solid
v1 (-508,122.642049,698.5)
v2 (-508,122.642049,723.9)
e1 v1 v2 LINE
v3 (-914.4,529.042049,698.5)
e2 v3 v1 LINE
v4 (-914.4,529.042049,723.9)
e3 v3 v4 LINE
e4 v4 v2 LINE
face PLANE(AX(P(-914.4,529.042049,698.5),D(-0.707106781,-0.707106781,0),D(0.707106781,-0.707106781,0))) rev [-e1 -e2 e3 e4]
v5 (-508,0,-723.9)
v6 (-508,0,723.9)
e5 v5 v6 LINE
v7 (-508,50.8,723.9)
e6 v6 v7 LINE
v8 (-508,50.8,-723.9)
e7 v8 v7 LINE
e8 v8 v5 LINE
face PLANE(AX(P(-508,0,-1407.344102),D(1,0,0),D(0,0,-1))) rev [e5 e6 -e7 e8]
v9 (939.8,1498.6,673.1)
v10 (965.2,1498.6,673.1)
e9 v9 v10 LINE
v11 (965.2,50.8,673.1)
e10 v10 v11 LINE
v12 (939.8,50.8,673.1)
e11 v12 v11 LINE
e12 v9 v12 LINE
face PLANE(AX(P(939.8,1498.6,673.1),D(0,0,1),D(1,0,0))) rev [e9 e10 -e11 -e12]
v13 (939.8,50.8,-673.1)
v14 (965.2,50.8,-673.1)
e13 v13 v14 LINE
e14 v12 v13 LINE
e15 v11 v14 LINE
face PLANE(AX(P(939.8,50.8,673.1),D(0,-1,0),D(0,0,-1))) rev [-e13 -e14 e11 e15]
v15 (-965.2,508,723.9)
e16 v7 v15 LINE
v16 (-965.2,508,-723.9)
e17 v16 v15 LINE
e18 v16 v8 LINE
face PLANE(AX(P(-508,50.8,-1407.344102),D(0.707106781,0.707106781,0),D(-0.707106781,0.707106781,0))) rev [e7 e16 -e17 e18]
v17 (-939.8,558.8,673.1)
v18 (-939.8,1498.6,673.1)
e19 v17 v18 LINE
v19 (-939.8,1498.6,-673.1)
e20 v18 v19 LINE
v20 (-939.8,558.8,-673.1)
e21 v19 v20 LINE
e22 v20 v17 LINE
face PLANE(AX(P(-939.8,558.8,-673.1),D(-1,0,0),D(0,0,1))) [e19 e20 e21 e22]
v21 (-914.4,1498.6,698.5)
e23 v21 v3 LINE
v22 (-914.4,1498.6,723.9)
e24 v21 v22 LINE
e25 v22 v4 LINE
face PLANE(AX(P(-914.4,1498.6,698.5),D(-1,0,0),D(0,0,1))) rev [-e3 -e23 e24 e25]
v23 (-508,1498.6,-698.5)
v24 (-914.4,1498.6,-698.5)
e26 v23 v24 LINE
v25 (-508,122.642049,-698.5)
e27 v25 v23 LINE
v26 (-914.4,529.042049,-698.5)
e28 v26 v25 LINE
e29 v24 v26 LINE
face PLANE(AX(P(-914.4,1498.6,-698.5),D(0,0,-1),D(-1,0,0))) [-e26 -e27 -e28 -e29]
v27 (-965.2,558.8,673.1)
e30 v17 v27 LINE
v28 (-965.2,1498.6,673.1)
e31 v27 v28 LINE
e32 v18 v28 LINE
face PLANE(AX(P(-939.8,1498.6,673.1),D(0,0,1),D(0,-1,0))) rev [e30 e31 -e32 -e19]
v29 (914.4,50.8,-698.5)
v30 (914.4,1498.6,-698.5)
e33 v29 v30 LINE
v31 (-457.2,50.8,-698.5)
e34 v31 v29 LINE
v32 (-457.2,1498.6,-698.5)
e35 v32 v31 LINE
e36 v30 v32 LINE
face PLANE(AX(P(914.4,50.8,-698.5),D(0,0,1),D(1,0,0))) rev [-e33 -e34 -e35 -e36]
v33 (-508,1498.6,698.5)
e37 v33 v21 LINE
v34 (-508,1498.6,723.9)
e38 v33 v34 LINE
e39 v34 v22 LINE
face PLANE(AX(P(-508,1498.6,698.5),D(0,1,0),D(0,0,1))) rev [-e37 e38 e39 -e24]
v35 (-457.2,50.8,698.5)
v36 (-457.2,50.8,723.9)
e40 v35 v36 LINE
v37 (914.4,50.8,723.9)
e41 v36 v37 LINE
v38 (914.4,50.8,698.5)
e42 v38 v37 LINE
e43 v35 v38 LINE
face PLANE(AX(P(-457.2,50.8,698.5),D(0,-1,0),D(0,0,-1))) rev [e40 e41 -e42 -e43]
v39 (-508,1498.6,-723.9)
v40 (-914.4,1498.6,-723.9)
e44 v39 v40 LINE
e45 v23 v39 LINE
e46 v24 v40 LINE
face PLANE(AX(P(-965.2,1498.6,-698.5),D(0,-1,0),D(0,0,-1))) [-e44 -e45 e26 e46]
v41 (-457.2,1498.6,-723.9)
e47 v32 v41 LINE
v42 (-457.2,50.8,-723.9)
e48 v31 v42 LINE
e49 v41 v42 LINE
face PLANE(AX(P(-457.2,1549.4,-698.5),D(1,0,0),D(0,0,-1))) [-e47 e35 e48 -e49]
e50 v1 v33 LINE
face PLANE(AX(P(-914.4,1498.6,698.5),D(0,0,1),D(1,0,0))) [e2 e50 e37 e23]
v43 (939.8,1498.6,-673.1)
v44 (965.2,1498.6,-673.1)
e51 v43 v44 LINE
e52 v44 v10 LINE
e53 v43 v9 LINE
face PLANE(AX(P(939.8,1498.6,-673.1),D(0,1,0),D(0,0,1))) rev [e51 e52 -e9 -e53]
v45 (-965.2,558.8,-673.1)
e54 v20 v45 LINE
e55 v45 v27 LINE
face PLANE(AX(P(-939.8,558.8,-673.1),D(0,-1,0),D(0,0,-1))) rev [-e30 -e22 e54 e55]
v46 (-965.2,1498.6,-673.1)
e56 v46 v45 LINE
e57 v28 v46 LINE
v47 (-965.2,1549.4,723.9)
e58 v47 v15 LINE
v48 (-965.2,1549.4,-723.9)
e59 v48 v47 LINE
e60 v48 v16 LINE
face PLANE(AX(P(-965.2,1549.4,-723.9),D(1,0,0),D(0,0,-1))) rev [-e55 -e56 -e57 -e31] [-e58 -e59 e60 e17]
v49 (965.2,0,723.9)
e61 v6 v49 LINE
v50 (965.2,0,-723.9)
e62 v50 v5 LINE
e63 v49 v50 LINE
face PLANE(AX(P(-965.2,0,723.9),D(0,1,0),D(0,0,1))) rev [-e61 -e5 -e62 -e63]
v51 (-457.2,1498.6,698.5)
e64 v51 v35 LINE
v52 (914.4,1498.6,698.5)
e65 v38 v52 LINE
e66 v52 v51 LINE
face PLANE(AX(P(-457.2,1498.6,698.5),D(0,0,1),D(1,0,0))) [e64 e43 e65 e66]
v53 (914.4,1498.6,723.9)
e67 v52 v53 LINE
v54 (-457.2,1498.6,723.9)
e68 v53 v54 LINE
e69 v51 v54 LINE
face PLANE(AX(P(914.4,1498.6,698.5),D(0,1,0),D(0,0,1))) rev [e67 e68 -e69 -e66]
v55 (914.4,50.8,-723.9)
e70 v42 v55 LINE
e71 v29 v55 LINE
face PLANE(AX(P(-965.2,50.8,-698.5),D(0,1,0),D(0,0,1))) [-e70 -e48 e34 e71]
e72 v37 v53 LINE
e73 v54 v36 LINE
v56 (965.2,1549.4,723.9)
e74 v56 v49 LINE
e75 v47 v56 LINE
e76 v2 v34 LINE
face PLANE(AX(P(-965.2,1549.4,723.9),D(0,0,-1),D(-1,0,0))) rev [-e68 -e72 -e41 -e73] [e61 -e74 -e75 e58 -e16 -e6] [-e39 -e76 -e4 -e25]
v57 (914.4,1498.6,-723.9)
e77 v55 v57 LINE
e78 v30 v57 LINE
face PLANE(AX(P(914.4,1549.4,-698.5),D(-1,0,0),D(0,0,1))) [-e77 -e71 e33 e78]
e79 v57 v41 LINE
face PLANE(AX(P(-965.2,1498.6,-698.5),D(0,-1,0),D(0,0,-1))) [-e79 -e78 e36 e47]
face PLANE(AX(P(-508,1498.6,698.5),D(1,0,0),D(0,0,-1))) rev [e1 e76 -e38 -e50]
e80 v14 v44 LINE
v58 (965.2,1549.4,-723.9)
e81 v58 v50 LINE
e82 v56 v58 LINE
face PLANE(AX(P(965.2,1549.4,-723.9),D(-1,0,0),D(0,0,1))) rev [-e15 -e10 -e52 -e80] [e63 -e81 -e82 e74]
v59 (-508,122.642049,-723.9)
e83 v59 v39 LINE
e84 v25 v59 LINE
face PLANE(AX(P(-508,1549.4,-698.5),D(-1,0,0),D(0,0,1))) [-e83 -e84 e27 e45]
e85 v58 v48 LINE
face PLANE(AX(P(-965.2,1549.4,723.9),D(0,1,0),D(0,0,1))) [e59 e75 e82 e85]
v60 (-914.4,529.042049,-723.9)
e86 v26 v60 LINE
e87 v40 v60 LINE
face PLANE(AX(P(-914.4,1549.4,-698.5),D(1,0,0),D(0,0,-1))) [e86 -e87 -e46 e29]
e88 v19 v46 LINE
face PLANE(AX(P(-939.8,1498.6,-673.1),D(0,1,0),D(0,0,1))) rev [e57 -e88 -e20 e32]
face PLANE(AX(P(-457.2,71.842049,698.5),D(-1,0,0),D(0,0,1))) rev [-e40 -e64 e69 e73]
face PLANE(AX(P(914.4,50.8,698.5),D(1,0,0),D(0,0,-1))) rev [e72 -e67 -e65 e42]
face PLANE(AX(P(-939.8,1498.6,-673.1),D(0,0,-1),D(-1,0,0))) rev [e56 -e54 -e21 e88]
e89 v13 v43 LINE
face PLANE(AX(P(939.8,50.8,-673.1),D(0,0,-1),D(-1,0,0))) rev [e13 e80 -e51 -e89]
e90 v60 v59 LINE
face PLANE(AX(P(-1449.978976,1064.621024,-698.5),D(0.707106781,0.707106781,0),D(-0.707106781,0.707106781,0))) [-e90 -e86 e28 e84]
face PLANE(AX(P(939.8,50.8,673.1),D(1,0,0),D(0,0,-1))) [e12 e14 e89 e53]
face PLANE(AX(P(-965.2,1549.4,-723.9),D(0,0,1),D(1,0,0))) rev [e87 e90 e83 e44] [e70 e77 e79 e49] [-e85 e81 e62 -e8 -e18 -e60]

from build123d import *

# Parameters (mm, degrees)
SKETCH1_W              = 1930.4
SKETCH1_H              = 1447.8
BOSS_EXTRUDE1_DEPTH    = 1549.4
CUT_EXTRUDE1_DEPTH     = 1447.8
CUT_EXTRUDE2_DEPTH     = 25.4
CUT_EXTRUDE3_START     = -1447.8
CUT_EXTRUDE3_OUTLINE_W = 1371.6
CUT_EXTRUDE3_OUTLINE_H = 1447.8
CUT_EXTRUDE3_DEPTH     = 25.4
SKETCH4_W              = 1346.2
SKETCH4_H              = 939.8
CUT_EXTRUDE4_DEPTH     = 25.4
SKETCH5_W              = 1346.2
SKETCH5_H              = 1447.8
CUT_EXTRUDE5_DEPTH     = 25.4


# Read off the part's stored shape, not the designer's step: Cut-Extrude3
with BuildPart() as part:
    # Sketch1 → Boss-Extrude1 (new body)
    with BuildSketch(Plane(origin=(0, 0, 0), x_dir=(1, 0, 0), z_dir=(0, 1, 0))):
        Rectangle(SKETCH1_W, SKETCH1_H)
    extrude(amount=BOSS_EXTRUDE1_DEPTH)

    # Sketch2 → Cut-Extrude1 (cut)
    with BuildSketch(Plane.XY.offset(723.9)):
        Polygon((-965.2, 0), (-508, 0), (-508, 50.8), (-965.2, 508), align=None)
    extrude(amount=-CUT_EXTRUDE1_DEPTH, mode=Mode.SUBTRACT)

    # Sketch3 → Cut-Extrude2 (cut)
    with BuildSketch(Plane.XY.offset(723.9)):
        Polygon((-914.4, 1498.6), (-914.4, 529.042048969), (-508, 122.642048969), (-508, 1498.6), align=None)
        Polygon((-457.2, 71.842048969), (-457.2, 50.8), (914.4, 50.8), (914.4, 1498.6), (-457.2, 1498.6), align=None)
    extrude(amount=-CUT_EXTRUDE2_DEPTH, mode=Mode.SUBTRACT)

    # Cut-Extrude3 outline → Cut-Extrude3 (cut)
    with BuildSketch(Plane.XY.offset(723.9).offset(CUT_EXTRUDE3_START)):
        Polygon((-508, 122.642048969), (-508, 1498.6), (-914.4, 1498.6), (-914.4, 529.042048969), align=None)
        with Locations((228.6, 774.7)):
            Rectangle(CUT_EXTRUDE3_OUTLINE_W, CUT_EXTRUDE3_OUTLINE_H)
    extrude(amount=CUT_EXTRUDE3_DEPTH, mode=Mode.SUBTRACT)

    # Sketch4 → Cut-Extrude4 (cut)
    with BuildSketch(Plane.ZY.offset(965.2)):
        with Locations((0, 1028.7)):
            Rectangle(SKETCH4_W, SKETCH4_H)
    extrude(amount=-CUT_EXTRUDE4_DEPTH, mode=Mode.SUBTRACT)

    # Sketch5 → Cut-Extrude5 (cut)
    with BuildSketch(Plane(origin=(965.2, 0, 0), x_dir=(0, 0, -1), z_dir=(1, 0, 0))):
        with Locations((0, 774.7)):
            Rectangle(SKETCH5_W, SKETCH5_H)
    extrude(amount=-CUT_EXTRUDE5_DEPTH, mode=Mode.SUBTRACT)


solid = part.part
